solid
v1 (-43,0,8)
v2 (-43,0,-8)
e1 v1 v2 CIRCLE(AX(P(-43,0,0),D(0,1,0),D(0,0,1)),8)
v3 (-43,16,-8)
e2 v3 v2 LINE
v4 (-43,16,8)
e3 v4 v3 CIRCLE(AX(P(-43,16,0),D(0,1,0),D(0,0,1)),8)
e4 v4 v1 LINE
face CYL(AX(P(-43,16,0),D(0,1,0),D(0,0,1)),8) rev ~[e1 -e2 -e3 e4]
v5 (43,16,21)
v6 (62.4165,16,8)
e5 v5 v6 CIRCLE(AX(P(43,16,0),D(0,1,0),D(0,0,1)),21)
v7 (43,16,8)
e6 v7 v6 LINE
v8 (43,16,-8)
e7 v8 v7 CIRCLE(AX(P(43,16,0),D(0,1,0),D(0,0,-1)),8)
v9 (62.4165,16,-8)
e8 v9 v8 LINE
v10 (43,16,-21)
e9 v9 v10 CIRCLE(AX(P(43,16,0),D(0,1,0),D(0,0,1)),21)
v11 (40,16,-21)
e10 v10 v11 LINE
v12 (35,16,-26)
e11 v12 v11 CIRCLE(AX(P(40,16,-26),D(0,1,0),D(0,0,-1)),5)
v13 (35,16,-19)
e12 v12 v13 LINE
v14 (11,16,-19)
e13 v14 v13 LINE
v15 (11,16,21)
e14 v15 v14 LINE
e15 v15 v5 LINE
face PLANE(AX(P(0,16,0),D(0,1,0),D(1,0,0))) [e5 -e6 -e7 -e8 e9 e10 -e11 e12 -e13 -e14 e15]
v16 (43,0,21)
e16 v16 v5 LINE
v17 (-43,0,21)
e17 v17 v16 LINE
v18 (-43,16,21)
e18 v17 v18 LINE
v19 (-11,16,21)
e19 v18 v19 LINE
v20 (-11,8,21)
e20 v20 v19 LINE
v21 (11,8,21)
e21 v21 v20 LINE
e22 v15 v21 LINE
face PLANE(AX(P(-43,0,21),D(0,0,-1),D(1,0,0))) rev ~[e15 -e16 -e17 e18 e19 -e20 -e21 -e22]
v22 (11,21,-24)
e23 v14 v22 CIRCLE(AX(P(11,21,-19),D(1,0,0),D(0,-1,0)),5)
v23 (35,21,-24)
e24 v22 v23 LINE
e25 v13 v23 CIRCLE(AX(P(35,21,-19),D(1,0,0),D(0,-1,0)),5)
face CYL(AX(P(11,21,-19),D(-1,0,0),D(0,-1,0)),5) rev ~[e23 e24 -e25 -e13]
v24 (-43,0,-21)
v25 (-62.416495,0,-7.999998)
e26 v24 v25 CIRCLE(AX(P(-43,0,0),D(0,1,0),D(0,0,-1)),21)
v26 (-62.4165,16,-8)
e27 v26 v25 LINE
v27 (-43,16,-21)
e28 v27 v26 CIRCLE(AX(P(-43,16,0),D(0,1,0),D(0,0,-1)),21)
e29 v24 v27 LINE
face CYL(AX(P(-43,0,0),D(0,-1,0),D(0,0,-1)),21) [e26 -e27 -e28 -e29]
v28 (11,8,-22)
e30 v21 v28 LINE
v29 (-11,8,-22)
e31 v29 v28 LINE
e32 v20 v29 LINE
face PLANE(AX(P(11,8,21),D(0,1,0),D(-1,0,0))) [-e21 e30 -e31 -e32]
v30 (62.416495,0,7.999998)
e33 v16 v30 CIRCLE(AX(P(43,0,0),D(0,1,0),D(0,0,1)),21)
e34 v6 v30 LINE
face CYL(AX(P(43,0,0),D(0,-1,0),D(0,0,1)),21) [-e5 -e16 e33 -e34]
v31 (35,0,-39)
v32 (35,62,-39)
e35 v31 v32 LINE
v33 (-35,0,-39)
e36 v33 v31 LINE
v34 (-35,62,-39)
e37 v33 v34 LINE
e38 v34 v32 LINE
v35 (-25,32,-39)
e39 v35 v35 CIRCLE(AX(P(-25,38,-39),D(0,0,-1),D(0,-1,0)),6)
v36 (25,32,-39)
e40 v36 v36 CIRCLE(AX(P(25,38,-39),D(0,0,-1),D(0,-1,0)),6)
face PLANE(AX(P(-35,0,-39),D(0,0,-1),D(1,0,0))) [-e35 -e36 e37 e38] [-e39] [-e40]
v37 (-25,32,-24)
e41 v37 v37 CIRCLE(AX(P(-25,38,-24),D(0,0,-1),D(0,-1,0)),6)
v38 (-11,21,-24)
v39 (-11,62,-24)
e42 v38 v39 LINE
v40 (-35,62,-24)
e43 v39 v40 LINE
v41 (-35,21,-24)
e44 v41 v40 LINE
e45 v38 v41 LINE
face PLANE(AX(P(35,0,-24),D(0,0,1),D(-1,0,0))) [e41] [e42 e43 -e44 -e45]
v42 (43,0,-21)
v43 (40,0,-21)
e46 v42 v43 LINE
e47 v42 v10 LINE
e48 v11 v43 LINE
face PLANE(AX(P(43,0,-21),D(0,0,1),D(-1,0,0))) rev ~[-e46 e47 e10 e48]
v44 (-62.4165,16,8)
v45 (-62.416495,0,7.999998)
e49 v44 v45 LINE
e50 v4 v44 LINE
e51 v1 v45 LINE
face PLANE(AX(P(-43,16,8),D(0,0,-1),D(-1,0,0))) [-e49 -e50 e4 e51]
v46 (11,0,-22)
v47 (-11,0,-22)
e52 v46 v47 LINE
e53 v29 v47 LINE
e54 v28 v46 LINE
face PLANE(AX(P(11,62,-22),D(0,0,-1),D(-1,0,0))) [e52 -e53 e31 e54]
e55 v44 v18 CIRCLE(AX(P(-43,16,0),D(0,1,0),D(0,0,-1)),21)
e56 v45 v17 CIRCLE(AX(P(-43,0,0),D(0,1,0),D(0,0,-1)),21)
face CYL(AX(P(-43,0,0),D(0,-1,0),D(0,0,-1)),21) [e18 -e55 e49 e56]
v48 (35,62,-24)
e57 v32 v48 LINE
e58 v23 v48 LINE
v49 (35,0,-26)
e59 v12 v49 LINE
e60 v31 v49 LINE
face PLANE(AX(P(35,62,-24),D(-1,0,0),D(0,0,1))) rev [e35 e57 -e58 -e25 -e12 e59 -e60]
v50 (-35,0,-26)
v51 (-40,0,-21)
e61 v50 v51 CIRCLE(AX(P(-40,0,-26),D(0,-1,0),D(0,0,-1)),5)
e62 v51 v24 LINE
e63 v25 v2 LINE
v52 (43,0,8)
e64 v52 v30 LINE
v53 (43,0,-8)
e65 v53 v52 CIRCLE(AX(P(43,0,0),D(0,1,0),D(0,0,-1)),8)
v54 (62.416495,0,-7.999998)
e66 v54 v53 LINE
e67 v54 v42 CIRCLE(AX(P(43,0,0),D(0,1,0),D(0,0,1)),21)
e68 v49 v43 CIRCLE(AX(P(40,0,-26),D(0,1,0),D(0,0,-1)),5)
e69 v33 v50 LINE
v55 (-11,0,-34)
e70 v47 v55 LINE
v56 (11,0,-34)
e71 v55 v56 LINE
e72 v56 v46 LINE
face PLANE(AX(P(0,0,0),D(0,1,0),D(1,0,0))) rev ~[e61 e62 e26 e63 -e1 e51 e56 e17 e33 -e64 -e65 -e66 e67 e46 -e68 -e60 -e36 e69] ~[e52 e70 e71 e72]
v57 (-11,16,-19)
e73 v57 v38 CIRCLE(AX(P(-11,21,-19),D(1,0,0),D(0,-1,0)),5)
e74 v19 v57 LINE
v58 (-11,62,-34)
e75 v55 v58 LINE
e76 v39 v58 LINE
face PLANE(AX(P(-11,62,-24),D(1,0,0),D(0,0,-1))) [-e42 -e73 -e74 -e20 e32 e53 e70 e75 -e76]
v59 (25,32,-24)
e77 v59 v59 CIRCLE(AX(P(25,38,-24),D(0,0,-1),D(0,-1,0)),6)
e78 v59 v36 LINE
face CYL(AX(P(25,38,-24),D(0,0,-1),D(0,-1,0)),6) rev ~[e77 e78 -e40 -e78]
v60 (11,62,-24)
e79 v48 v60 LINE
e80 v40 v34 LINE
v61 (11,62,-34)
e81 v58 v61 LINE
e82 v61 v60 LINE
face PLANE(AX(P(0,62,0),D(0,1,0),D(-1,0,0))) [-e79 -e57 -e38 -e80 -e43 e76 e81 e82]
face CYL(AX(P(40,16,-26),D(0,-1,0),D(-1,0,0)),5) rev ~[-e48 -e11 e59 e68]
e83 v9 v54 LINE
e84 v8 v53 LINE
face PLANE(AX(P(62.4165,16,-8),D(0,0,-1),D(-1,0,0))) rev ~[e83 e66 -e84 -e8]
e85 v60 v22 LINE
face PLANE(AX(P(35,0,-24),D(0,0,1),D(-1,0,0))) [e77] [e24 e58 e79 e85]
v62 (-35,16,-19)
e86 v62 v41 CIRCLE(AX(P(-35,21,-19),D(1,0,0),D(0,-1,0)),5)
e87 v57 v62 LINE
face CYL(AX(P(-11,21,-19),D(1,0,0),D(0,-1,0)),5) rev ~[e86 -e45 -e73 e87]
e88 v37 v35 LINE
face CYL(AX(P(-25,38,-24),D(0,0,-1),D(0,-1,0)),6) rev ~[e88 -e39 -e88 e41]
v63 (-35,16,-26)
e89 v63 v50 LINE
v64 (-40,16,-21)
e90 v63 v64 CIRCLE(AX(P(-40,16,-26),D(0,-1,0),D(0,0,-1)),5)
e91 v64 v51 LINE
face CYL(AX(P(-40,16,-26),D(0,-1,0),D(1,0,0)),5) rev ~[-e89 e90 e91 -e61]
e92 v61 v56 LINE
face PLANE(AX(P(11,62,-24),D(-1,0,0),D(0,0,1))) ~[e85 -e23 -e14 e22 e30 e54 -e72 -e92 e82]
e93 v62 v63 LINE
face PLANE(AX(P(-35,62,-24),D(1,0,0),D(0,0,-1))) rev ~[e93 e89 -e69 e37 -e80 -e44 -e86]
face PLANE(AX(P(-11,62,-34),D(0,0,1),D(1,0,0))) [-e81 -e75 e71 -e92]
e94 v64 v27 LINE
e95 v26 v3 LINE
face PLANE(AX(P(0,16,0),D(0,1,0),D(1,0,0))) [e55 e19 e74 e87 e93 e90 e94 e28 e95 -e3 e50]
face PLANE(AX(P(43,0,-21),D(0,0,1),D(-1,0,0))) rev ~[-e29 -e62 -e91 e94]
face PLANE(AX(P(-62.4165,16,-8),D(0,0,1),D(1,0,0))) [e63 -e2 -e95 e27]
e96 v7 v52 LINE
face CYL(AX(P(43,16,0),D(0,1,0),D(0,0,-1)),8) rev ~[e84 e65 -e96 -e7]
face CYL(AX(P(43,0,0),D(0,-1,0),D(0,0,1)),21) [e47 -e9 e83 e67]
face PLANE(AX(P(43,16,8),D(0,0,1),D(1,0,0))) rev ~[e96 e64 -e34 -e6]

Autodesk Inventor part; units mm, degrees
ref_plane "YZ Plane" through (0, 0, 0) normal (1, 0, 0) x (0, 1, 0)
ref_plane "XZ Plane" through (0, 0, 0) normal (0, 1, 0) x (-1, 0, 0)
ref_plane "XY Plane" through (0, 0, 0) normal (0, 0, 1) x (1, 0, 0)
sketch "Sketch1" plane through (0, 0, 0) normal (0, 1, 0) x (-1, 0, 0)
  line L0 (43, 0) -> (-43, 0) construction
  line L1 (43, 21) -> (-43, 21)
  line L2 (-43, -21) -> (43, -21)
  arc A0 (43, -21) -> (43, 21) centre (43, 0) ccw
  arc A1 (-43, 21) -> (-43, -21) centre (-43, 0) ccw
  point P0 (0, 0)
  dimension "d0" = 43
  dimension "d1" = 21
extrude "Extrusion1" add sketch "Sketch1" along normal blind 16
sketch "Sketch2" plane through (0, 16, 0) normal (0, 1, 0) x (1, 0, 0)
  arc A0 (43, -21) -> (43, 21) centre (43, 0) ccw projected
  arc A1 (-43, 21) -> (-43, -21) centre (-43, 0) ccw projected
  line L0 (-62.4165, 8) -> (-43, 8)
  arc A2 (-43, -8) -> (-43, 8) centre (-43, 0) ccw
  line L1 (-43, -8) -> (-62.4165, -8)
  line L2 (0, 29.4) -> (0, -29.4) construction
  line L3 (62.4165, 8) -> (43, 8)
  arc A3 (43, 8) -> (43, -8) centre (43, 0) ccw
  line L4 (43, -8) -> (62.4165, -8)
  point P0 (0, 0)
  dimension "d4" = 8
extrude "Extrusion2" cut sketch "Sketch2" against normal through all
sketch "Sketch3" plane through (0, 0, 0) normal (0, 1, 0) x (-1, 0, 0)
  line L0 (35, -39) -> (-35, -39)
  line L1 (-35, -39) -> (-35, -24)
  line L2 (-35, -24) -> (35, -24)
  line L3 (35, -24) -> (35, -39)
  line L4 (43, 21) -> (-43, 21) projected
  point P0 (0, 0)
  point P1 (0, -24)
  point P2 (0, 21)
  dimension "d7" = 70
  dimension "d8" = 15
  dimension "d9" = 60
extrude "Extrusion3" add sketch "Sketch3" along normal blind 62
sketch "Sketch4" plane through (0, 16, 0) normal (0, 1, 0) x (1, 0, 0)
  line L0 (43, 21) -> (-43, 21) projected
  line L1 (-35, 24) -> (35, 24) projected
  line L2 (-35, 24) -> (35, 24)
  line L3 (35, 24) -> (35, 21)
  line L4 (35, 21) -> (-35, 21)
  line L5 (-35, 21) -> (-35, 24)
  point P0 (0, 0)
extrude "Extrusion4" add sketch "Sketch4" against normal up to surface (16 mm away)
sketch "Sketch5" plane through (0, 62, 0) normal (0, 1, 0) x (1, 0, 0)
  line L0 (35, 39) -> (-35, 39) projected
  line L1 (-11, 34) -> (11, 34)
  line L2 (11, 34) -> (11, 22)
  line L3 (11, 22) -> (-11, 22)
  line L4 (-11, 22) -> (-11, 34)
  point P0 (0, 0)
  point P1 (0, 22)
  dimension "d14" = 5
  dimension "d15" = 22
  dimension "d16" = 12
extrude "Extrusion5" cut sketch "Sketch5" against normal through all
sketch "Sketch6" plane through (-43, 0, 21) normal (0, 0, 1) x (1, 0, 0)
  line L0 (0, 0) -> (86, 0) projected
  line L1 (0, 16) -> (86, 16) projected
  line L2 (32, 16) -> (54, 16)
  line L3 (54, 16) -> (54, 8)
  line L4 (54, 8) -> (32, 8)
  line L5 (32, 8) -> (32, 16)
  line L6 (32, 16) -> (32, 62) projected
  line L7 (54, 62) -> (54, 16) projected
  point P0 (43, 0)
  dimension "d19" = 8
extrude "Extrusion6" cut sketch "Sketch6" against normal up to surface (55 mm away)
sketch "Sketch7" plane through (-11, 62, -24) normal (1, 0, 0) x (0, 0, -1)
  line L0 (0, -46) -> (0, 0) projected
  line L1 (-45, -46) -> (0, -46) projected
  arc A0 (-5, -46) -> (0, -41) centre (-5, -41) ccw
  point P0 (-24, -62)
  dimension "d22" = 5
extrude "Extrusion7" add sketch "Sketch7" against normal up to surface (24 mm away)
mirror "Mirror1" about plane through (0, 0, 0) normal (1, 0, 0) of "Extrusion7"
fillet "Fillet1" radius 5 2 edges at (35, 8, -21) (-35, 8, -21)
sketch "Sketch8" plane through (-35, 62, -24) normal (0, 0, 1) x (1, 0, 0)
  line L0 (10, -24) -> (60, -24) construction
  line L1 (70, -62) -> (0, -62) projected
  point P0 (35, -62)
  point P1 (35, -24)
  dimension "d26" = 50
  dimension "d27" = 38
hole "Hole1" at (-25, 38, -24) at (25, 38, -24) direction (0, 0, -1) diameter 12 end through all
properties part number "Part022. Corner piece" material "Steel, Cast"
